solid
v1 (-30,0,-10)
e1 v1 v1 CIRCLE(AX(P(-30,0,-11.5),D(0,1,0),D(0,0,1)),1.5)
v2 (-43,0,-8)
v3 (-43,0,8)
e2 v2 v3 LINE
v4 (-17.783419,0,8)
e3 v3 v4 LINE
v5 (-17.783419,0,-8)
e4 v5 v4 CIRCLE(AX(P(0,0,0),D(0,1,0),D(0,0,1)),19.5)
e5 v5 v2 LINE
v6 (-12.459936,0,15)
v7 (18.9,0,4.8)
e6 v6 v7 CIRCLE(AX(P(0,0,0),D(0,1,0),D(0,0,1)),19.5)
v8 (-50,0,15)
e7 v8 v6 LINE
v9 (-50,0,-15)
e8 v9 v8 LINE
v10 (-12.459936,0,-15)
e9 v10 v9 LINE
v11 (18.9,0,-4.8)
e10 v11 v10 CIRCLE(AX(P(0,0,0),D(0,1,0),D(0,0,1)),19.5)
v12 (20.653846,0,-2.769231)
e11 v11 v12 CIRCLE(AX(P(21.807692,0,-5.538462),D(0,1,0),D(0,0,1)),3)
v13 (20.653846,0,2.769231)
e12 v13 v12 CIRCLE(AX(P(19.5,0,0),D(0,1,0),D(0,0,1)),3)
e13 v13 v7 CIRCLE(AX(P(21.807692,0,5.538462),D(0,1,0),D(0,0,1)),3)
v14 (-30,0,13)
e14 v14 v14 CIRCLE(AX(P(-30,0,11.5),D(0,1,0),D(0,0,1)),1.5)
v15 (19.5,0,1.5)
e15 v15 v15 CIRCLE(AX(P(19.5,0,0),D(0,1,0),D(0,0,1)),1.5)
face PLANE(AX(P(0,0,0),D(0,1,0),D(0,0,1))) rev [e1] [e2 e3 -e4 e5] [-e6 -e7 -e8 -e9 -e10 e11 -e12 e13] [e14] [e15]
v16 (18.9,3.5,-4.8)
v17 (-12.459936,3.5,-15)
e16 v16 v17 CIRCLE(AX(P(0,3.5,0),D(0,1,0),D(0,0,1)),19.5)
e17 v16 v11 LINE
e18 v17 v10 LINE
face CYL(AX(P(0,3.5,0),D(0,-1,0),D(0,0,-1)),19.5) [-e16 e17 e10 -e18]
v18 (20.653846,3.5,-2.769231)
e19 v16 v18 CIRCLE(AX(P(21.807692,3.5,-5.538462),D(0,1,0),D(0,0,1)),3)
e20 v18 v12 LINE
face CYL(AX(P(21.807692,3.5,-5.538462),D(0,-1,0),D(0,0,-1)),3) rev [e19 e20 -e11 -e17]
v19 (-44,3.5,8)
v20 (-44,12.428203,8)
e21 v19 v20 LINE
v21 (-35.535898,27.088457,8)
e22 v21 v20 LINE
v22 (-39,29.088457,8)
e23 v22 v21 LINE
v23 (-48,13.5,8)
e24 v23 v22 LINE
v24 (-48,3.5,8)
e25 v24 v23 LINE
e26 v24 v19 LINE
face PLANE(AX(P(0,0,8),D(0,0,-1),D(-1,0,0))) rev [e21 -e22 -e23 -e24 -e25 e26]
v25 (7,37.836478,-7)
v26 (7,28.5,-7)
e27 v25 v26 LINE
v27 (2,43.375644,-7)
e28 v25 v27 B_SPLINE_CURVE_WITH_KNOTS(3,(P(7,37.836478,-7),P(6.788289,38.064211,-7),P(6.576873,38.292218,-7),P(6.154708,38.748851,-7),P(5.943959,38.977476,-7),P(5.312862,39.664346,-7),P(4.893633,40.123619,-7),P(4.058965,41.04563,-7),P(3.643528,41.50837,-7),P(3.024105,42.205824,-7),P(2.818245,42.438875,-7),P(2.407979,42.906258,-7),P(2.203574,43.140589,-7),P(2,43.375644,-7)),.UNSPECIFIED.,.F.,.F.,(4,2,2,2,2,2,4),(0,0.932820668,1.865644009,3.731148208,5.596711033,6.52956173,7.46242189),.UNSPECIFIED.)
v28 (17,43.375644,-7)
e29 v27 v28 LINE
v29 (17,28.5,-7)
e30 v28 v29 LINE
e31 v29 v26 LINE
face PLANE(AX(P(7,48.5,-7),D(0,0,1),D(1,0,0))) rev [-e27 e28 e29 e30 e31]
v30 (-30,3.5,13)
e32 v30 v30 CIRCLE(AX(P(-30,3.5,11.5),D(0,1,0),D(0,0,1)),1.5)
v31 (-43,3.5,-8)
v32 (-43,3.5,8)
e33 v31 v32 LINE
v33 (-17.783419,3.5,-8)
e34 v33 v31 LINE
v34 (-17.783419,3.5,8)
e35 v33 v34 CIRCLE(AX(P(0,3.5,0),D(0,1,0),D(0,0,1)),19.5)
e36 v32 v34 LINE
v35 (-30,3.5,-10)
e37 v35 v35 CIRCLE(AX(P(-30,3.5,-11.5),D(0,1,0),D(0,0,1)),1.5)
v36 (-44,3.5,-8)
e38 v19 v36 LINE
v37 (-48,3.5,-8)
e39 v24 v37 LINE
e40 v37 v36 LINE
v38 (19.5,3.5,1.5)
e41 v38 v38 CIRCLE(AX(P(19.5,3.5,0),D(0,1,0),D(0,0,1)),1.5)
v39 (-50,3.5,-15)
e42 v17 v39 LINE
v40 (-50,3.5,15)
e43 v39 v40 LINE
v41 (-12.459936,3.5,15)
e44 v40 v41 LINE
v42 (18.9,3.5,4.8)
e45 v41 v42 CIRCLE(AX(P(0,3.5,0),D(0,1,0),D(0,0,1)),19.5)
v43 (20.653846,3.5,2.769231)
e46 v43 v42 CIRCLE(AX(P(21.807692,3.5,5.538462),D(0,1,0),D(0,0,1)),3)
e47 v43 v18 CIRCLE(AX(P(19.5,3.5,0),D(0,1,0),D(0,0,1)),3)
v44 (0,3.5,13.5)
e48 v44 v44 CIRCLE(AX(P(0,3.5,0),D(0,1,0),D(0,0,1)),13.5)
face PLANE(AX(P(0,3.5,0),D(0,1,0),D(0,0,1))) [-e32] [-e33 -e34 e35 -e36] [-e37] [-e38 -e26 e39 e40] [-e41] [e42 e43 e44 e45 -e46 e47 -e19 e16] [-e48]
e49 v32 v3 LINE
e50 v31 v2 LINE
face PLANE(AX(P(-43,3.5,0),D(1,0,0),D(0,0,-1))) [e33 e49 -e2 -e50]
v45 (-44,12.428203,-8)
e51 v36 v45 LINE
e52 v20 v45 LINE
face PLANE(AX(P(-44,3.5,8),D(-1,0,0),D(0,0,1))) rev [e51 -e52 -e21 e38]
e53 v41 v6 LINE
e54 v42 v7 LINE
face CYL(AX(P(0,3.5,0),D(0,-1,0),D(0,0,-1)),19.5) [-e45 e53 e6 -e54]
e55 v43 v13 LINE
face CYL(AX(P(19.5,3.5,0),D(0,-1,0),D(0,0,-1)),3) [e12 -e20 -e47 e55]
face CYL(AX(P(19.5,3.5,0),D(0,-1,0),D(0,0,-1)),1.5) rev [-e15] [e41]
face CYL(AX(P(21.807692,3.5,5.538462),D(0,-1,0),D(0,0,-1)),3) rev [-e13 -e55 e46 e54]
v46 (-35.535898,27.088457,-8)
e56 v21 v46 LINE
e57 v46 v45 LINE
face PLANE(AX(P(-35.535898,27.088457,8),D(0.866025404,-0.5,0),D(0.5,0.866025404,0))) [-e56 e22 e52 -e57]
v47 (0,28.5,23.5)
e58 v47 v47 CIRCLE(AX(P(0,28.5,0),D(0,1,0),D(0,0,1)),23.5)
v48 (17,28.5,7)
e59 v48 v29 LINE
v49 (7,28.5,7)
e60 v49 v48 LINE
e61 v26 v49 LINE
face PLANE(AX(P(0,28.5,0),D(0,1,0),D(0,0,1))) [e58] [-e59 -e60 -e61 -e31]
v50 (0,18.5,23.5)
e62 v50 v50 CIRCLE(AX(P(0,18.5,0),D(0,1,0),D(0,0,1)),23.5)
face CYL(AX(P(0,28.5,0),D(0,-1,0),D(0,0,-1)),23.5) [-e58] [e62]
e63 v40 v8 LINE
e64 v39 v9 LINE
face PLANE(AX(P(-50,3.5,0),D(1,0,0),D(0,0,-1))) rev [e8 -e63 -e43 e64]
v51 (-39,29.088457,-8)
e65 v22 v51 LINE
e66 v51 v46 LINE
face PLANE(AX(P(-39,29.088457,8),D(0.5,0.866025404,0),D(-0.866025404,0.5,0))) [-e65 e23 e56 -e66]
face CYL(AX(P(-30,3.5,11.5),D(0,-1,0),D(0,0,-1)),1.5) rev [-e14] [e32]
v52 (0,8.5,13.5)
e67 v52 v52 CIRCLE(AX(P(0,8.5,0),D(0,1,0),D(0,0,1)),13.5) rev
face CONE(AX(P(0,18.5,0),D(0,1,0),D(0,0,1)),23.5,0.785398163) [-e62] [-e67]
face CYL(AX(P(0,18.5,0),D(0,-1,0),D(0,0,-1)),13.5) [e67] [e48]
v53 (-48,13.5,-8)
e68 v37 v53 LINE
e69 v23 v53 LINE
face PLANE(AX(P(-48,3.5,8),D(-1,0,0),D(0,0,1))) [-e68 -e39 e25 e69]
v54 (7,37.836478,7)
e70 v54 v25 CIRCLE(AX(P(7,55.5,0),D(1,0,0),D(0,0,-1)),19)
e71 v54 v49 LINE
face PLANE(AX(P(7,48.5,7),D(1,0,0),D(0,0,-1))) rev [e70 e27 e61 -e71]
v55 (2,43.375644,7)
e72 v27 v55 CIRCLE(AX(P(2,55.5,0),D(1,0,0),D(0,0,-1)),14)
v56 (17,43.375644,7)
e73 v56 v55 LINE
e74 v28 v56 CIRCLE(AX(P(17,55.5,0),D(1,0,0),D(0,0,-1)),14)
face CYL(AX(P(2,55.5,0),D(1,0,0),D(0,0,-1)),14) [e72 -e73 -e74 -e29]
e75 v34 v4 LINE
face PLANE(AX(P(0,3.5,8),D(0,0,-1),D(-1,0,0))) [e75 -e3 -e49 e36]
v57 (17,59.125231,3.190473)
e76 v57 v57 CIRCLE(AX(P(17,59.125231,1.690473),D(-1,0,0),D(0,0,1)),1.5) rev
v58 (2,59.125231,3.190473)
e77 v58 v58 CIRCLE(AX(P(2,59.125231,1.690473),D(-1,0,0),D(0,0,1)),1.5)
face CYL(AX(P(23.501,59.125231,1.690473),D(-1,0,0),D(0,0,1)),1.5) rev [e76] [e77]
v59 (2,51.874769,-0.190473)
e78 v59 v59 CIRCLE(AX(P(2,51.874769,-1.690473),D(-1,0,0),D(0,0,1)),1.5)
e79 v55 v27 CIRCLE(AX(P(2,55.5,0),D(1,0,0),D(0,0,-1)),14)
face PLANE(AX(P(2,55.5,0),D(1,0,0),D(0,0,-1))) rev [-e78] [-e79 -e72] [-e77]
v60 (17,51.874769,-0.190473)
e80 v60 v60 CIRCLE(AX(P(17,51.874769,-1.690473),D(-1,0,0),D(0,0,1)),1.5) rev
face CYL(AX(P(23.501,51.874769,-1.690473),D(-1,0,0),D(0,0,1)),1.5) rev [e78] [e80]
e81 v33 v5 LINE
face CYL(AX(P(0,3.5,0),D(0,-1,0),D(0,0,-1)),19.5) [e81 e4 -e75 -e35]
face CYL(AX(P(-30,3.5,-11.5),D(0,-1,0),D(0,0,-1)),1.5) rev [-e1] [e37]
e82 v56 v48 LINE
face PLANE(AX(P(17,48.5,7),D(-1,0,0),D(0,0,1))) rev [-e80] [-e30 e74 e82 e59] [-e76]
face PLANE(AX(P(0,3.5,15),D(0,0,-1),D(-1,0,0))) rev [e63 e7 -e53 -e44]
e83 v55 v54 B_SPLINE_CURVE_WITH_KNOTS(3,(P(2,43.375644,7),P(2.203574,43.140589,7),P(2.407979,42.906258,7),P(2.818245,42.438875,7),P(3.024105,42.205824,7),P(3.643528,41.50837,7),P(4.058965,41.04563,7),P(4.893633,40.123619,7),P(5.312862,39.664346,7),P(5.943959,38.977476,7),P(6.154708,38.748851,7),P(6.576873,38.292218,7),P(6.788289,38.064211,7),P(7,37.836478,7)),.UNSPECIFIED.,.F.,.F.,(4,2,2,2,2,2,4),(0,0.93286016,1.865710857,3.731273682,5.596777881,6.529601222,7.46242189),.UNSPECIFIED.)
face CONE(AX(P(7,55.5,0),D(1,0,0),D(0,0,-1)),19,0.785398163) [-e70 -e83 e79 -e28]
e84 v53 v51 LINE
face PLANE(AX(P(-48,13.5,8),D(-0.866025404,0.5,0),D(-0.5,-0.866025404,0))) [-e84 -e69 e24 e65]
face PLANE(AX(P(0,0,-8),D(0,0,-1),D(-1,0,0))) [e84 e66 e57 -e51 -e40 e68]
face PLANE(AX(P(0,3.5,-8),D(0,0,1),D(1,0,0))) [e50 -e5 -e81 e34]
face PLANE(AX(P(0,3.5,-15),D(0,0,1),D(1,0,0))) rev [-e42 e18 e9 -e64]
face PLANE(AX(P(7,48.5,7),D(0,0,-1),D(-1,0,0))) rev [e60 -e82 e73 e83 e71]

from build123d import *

# Parameters (mm, degrees)
SKETCH1_R           = 1.5
BOSS_EXTRUDE1_DEPTH = 3.5
BOSS_EXTRUDE2_DEPTH = 16
SKETCH4_R           = 13.5
BOSS_EXTRUDE3_DEPTH = 15
SKETCH5_R           = 23.5
BOSS_EXTRUDE4_DEPTH = 10
SKETCH6_W           = 10
SKETCH6_H           = 14
BOSS_EXTRUDE5_DEPTH = 20
SKETCH7_R           = 14
BOSS_EXTRUDE6_DEPTH = 15
CHAMFER1_SIZE       = 10
CUT_EXTRUDE4_REACH  = 91.925
SKETCH10_R          = 1.5
CHAMFER2_SIZE       = 5


with BuildPart() as part:
    # Sketch1 → Boss-Extrude1 (new body)
    with BuildSketch(Plane(origin=(0, 0, 0), x_dir=(1, 0, 0), z_dir=(0, 1, 0))):
        with BuildLine():
            Line((-50, -15), (-12.459935794, -15))
            ThreePointArc((-12.459935794, -15), (6.031468042, -18.543769661), (18.9, -4.8))
            ThreePointArc((18.9, -4.8), (19.537223284, -3.577601927), (20.653846154, -2.769230769))
            ThreePointArc((20.653846154, -2.769230769), (22.5, 0), (20.653846154, 2.769230769))
            ThreePointArc((20.653846154, 2.769230769), (19.537223284, 3.577601927), (18.9, 4.8))
            ThreePointArc((18.9, 4.8), (6.031468042, 18.543769661), (-12.459935794, 15))
            Line((-12.459935794, 15), (-50, 15))
            Line((-50, 15), (-50, -15))
        make_face()
        with Locations(Location((-30, -11.5, 0), (0, 0, 270))):
            Circle(SKETCH1_R, mode=Mode.SUBTRACT)
        with BuildLine():
            Line((-43, 8), (-17.783419244, 8))
            ThreePointArc((-17.783419244, 8), (-19.5, 0), (-17.783419244, -8))
            Line((-17.783419244, -8), (-43, -8))
            Line((-43, -8), (-43, 8))
        make_face(mode=Mode.SUBTRACT)
        with Locations(Location((-30, 11.5, 0), (0, 0, 270))):
            Circle(SKETCH1_R, mode=Mode.SUBTRACT)
        with Locations(Location((19.5, 0, 0), (0, 0, 270))):
            Circle(SKETCH1_R, mode=Mode.SUBTRACT)
    extrude(amount=BOSS_EXTRUDE1_DEPTH)

    # Sketch2 → Boss-Extrude2 (add)
    with BuildSketch(Plane.XY.offset(-8)):
        Polygon((-48, 3.5), (-48, 13.5), (-39, 29.088457268), (-35.535898385, 27.088457268), (-44, 12.42820323), (-44, 3.5), align=None)
    extrude(amount=BOSS_EXTRUDE2_DEPTH)

    # Sketch4 → Boss-Extrude3 (add)
    with BuildSketch(Plane(origin=(0, 3.5, 0), x_dir=(1, 0, 0), z_dir=(0, 1, 0))):
        with Locations(Location((0, 0, 0), (0, 0, 270))):
            Circle(SKETCH4_R)
    extrude(amount=BOSS_EXTRUDE3_DEPTH)

    # Sketch5 → Boss-Extrude4 (add)
    with BuildSketch(Plane(origin=(0, 18.5, 0), x_dir=(1, 0, 0), z_dir=(0, 1, 0))):
        with Locations(Location((0, 0, 0), (0, 0, 270))):
            Circle(SKETCH5_R)
    extrude(amount=BOSS_EXTRUDE4_DEPTH)

    # Sketch6 → Boss-Extrude5 (add)
    with BuildSketch(Plane(origin=(0, 28.5, 0), x_dir=(1, 0, 0), z_dir=(0, 1, 0))):
        with Locations((12, 0)):
            Rectangle(SKETCH6_W, SKETCH6_H)
    extrude(amount=BOSS_EXTRUDE5_DEPTH)

    # Sketch7 → Boss-Extrude6 (add)
    with BuildSketch(Plane(origin=(17, 0, 0), x_dir=(0, 0, -1), z_dir=(1, 0, 0))):
        with Locations((0, 55.5)):
            Circle(SKETCH7_R)
    extrude(amount=-BOSS_EXTRUDE6_DEPTH)

    # Chamfer1
    chamfer1_edges = [part.edges().sort_by_distance(p)[0] for p in [
        (0, 18.5, -13.5),
    ]]
    chamfer(chamfer1_edges, length=CHAMFER1_SIZE - 0.0001)  # a hair under: the kernel refuses the full size

    # Sketch10 → Cut-Extrude4 (cut, up to next)
    with BuildSketch(Plane.ZY.offset(-2), mode=Mode.PRIVATE) as cut_extrude4_sk1:
        with Locations((1.690473047, 59.125231148)):
            Circle(SKETCH10_R)
    cut_extrude4_tool1 = extrude(cut_extrude4_sk1.sketch, amount=-CUT_EXTRUDE4_REACH, mode=Mode.PRIVATE) & part.part
    # Sketch10 → Cut-Extrude4 (cut, up to next)
    with BuildSketch(Plane.ZY.offset(-2), mode=Mode.PRIVATE) as cut_extrude4_sk2:
        with Locations((-1.690473047, 51.874768852)):
            Circle(SKETCH10_R)
    cut_extrude4_tool2 = extrude(cut_extrude4_sk2.sketch, amount=-CUT_EXTRUDE4_REACH, mode=Mode.PRIVATE) & part.part
    add(cut_extrude4_tool1.solids().sort_by_distance((2, 59.125231, 1.690473))[0], mode=Mode.SUBTRACT)
    add(cut_extrude4_tool2.solids().sort_by_distance((2, 51.874769, -1.690473))[0], mode=Mode.SUBTRACT)

    # Chamfer2
    chamfer2_edges = [part.edges().sort_by_distance(p)[0] for p in [
        (7, 41.5, 0),
    ]]
    chamfer(chamfer2_edges, length=CHAMFER2_SIZE - 0.0001)  # a hair under: the kernel refuses the full size


solid = part.part
